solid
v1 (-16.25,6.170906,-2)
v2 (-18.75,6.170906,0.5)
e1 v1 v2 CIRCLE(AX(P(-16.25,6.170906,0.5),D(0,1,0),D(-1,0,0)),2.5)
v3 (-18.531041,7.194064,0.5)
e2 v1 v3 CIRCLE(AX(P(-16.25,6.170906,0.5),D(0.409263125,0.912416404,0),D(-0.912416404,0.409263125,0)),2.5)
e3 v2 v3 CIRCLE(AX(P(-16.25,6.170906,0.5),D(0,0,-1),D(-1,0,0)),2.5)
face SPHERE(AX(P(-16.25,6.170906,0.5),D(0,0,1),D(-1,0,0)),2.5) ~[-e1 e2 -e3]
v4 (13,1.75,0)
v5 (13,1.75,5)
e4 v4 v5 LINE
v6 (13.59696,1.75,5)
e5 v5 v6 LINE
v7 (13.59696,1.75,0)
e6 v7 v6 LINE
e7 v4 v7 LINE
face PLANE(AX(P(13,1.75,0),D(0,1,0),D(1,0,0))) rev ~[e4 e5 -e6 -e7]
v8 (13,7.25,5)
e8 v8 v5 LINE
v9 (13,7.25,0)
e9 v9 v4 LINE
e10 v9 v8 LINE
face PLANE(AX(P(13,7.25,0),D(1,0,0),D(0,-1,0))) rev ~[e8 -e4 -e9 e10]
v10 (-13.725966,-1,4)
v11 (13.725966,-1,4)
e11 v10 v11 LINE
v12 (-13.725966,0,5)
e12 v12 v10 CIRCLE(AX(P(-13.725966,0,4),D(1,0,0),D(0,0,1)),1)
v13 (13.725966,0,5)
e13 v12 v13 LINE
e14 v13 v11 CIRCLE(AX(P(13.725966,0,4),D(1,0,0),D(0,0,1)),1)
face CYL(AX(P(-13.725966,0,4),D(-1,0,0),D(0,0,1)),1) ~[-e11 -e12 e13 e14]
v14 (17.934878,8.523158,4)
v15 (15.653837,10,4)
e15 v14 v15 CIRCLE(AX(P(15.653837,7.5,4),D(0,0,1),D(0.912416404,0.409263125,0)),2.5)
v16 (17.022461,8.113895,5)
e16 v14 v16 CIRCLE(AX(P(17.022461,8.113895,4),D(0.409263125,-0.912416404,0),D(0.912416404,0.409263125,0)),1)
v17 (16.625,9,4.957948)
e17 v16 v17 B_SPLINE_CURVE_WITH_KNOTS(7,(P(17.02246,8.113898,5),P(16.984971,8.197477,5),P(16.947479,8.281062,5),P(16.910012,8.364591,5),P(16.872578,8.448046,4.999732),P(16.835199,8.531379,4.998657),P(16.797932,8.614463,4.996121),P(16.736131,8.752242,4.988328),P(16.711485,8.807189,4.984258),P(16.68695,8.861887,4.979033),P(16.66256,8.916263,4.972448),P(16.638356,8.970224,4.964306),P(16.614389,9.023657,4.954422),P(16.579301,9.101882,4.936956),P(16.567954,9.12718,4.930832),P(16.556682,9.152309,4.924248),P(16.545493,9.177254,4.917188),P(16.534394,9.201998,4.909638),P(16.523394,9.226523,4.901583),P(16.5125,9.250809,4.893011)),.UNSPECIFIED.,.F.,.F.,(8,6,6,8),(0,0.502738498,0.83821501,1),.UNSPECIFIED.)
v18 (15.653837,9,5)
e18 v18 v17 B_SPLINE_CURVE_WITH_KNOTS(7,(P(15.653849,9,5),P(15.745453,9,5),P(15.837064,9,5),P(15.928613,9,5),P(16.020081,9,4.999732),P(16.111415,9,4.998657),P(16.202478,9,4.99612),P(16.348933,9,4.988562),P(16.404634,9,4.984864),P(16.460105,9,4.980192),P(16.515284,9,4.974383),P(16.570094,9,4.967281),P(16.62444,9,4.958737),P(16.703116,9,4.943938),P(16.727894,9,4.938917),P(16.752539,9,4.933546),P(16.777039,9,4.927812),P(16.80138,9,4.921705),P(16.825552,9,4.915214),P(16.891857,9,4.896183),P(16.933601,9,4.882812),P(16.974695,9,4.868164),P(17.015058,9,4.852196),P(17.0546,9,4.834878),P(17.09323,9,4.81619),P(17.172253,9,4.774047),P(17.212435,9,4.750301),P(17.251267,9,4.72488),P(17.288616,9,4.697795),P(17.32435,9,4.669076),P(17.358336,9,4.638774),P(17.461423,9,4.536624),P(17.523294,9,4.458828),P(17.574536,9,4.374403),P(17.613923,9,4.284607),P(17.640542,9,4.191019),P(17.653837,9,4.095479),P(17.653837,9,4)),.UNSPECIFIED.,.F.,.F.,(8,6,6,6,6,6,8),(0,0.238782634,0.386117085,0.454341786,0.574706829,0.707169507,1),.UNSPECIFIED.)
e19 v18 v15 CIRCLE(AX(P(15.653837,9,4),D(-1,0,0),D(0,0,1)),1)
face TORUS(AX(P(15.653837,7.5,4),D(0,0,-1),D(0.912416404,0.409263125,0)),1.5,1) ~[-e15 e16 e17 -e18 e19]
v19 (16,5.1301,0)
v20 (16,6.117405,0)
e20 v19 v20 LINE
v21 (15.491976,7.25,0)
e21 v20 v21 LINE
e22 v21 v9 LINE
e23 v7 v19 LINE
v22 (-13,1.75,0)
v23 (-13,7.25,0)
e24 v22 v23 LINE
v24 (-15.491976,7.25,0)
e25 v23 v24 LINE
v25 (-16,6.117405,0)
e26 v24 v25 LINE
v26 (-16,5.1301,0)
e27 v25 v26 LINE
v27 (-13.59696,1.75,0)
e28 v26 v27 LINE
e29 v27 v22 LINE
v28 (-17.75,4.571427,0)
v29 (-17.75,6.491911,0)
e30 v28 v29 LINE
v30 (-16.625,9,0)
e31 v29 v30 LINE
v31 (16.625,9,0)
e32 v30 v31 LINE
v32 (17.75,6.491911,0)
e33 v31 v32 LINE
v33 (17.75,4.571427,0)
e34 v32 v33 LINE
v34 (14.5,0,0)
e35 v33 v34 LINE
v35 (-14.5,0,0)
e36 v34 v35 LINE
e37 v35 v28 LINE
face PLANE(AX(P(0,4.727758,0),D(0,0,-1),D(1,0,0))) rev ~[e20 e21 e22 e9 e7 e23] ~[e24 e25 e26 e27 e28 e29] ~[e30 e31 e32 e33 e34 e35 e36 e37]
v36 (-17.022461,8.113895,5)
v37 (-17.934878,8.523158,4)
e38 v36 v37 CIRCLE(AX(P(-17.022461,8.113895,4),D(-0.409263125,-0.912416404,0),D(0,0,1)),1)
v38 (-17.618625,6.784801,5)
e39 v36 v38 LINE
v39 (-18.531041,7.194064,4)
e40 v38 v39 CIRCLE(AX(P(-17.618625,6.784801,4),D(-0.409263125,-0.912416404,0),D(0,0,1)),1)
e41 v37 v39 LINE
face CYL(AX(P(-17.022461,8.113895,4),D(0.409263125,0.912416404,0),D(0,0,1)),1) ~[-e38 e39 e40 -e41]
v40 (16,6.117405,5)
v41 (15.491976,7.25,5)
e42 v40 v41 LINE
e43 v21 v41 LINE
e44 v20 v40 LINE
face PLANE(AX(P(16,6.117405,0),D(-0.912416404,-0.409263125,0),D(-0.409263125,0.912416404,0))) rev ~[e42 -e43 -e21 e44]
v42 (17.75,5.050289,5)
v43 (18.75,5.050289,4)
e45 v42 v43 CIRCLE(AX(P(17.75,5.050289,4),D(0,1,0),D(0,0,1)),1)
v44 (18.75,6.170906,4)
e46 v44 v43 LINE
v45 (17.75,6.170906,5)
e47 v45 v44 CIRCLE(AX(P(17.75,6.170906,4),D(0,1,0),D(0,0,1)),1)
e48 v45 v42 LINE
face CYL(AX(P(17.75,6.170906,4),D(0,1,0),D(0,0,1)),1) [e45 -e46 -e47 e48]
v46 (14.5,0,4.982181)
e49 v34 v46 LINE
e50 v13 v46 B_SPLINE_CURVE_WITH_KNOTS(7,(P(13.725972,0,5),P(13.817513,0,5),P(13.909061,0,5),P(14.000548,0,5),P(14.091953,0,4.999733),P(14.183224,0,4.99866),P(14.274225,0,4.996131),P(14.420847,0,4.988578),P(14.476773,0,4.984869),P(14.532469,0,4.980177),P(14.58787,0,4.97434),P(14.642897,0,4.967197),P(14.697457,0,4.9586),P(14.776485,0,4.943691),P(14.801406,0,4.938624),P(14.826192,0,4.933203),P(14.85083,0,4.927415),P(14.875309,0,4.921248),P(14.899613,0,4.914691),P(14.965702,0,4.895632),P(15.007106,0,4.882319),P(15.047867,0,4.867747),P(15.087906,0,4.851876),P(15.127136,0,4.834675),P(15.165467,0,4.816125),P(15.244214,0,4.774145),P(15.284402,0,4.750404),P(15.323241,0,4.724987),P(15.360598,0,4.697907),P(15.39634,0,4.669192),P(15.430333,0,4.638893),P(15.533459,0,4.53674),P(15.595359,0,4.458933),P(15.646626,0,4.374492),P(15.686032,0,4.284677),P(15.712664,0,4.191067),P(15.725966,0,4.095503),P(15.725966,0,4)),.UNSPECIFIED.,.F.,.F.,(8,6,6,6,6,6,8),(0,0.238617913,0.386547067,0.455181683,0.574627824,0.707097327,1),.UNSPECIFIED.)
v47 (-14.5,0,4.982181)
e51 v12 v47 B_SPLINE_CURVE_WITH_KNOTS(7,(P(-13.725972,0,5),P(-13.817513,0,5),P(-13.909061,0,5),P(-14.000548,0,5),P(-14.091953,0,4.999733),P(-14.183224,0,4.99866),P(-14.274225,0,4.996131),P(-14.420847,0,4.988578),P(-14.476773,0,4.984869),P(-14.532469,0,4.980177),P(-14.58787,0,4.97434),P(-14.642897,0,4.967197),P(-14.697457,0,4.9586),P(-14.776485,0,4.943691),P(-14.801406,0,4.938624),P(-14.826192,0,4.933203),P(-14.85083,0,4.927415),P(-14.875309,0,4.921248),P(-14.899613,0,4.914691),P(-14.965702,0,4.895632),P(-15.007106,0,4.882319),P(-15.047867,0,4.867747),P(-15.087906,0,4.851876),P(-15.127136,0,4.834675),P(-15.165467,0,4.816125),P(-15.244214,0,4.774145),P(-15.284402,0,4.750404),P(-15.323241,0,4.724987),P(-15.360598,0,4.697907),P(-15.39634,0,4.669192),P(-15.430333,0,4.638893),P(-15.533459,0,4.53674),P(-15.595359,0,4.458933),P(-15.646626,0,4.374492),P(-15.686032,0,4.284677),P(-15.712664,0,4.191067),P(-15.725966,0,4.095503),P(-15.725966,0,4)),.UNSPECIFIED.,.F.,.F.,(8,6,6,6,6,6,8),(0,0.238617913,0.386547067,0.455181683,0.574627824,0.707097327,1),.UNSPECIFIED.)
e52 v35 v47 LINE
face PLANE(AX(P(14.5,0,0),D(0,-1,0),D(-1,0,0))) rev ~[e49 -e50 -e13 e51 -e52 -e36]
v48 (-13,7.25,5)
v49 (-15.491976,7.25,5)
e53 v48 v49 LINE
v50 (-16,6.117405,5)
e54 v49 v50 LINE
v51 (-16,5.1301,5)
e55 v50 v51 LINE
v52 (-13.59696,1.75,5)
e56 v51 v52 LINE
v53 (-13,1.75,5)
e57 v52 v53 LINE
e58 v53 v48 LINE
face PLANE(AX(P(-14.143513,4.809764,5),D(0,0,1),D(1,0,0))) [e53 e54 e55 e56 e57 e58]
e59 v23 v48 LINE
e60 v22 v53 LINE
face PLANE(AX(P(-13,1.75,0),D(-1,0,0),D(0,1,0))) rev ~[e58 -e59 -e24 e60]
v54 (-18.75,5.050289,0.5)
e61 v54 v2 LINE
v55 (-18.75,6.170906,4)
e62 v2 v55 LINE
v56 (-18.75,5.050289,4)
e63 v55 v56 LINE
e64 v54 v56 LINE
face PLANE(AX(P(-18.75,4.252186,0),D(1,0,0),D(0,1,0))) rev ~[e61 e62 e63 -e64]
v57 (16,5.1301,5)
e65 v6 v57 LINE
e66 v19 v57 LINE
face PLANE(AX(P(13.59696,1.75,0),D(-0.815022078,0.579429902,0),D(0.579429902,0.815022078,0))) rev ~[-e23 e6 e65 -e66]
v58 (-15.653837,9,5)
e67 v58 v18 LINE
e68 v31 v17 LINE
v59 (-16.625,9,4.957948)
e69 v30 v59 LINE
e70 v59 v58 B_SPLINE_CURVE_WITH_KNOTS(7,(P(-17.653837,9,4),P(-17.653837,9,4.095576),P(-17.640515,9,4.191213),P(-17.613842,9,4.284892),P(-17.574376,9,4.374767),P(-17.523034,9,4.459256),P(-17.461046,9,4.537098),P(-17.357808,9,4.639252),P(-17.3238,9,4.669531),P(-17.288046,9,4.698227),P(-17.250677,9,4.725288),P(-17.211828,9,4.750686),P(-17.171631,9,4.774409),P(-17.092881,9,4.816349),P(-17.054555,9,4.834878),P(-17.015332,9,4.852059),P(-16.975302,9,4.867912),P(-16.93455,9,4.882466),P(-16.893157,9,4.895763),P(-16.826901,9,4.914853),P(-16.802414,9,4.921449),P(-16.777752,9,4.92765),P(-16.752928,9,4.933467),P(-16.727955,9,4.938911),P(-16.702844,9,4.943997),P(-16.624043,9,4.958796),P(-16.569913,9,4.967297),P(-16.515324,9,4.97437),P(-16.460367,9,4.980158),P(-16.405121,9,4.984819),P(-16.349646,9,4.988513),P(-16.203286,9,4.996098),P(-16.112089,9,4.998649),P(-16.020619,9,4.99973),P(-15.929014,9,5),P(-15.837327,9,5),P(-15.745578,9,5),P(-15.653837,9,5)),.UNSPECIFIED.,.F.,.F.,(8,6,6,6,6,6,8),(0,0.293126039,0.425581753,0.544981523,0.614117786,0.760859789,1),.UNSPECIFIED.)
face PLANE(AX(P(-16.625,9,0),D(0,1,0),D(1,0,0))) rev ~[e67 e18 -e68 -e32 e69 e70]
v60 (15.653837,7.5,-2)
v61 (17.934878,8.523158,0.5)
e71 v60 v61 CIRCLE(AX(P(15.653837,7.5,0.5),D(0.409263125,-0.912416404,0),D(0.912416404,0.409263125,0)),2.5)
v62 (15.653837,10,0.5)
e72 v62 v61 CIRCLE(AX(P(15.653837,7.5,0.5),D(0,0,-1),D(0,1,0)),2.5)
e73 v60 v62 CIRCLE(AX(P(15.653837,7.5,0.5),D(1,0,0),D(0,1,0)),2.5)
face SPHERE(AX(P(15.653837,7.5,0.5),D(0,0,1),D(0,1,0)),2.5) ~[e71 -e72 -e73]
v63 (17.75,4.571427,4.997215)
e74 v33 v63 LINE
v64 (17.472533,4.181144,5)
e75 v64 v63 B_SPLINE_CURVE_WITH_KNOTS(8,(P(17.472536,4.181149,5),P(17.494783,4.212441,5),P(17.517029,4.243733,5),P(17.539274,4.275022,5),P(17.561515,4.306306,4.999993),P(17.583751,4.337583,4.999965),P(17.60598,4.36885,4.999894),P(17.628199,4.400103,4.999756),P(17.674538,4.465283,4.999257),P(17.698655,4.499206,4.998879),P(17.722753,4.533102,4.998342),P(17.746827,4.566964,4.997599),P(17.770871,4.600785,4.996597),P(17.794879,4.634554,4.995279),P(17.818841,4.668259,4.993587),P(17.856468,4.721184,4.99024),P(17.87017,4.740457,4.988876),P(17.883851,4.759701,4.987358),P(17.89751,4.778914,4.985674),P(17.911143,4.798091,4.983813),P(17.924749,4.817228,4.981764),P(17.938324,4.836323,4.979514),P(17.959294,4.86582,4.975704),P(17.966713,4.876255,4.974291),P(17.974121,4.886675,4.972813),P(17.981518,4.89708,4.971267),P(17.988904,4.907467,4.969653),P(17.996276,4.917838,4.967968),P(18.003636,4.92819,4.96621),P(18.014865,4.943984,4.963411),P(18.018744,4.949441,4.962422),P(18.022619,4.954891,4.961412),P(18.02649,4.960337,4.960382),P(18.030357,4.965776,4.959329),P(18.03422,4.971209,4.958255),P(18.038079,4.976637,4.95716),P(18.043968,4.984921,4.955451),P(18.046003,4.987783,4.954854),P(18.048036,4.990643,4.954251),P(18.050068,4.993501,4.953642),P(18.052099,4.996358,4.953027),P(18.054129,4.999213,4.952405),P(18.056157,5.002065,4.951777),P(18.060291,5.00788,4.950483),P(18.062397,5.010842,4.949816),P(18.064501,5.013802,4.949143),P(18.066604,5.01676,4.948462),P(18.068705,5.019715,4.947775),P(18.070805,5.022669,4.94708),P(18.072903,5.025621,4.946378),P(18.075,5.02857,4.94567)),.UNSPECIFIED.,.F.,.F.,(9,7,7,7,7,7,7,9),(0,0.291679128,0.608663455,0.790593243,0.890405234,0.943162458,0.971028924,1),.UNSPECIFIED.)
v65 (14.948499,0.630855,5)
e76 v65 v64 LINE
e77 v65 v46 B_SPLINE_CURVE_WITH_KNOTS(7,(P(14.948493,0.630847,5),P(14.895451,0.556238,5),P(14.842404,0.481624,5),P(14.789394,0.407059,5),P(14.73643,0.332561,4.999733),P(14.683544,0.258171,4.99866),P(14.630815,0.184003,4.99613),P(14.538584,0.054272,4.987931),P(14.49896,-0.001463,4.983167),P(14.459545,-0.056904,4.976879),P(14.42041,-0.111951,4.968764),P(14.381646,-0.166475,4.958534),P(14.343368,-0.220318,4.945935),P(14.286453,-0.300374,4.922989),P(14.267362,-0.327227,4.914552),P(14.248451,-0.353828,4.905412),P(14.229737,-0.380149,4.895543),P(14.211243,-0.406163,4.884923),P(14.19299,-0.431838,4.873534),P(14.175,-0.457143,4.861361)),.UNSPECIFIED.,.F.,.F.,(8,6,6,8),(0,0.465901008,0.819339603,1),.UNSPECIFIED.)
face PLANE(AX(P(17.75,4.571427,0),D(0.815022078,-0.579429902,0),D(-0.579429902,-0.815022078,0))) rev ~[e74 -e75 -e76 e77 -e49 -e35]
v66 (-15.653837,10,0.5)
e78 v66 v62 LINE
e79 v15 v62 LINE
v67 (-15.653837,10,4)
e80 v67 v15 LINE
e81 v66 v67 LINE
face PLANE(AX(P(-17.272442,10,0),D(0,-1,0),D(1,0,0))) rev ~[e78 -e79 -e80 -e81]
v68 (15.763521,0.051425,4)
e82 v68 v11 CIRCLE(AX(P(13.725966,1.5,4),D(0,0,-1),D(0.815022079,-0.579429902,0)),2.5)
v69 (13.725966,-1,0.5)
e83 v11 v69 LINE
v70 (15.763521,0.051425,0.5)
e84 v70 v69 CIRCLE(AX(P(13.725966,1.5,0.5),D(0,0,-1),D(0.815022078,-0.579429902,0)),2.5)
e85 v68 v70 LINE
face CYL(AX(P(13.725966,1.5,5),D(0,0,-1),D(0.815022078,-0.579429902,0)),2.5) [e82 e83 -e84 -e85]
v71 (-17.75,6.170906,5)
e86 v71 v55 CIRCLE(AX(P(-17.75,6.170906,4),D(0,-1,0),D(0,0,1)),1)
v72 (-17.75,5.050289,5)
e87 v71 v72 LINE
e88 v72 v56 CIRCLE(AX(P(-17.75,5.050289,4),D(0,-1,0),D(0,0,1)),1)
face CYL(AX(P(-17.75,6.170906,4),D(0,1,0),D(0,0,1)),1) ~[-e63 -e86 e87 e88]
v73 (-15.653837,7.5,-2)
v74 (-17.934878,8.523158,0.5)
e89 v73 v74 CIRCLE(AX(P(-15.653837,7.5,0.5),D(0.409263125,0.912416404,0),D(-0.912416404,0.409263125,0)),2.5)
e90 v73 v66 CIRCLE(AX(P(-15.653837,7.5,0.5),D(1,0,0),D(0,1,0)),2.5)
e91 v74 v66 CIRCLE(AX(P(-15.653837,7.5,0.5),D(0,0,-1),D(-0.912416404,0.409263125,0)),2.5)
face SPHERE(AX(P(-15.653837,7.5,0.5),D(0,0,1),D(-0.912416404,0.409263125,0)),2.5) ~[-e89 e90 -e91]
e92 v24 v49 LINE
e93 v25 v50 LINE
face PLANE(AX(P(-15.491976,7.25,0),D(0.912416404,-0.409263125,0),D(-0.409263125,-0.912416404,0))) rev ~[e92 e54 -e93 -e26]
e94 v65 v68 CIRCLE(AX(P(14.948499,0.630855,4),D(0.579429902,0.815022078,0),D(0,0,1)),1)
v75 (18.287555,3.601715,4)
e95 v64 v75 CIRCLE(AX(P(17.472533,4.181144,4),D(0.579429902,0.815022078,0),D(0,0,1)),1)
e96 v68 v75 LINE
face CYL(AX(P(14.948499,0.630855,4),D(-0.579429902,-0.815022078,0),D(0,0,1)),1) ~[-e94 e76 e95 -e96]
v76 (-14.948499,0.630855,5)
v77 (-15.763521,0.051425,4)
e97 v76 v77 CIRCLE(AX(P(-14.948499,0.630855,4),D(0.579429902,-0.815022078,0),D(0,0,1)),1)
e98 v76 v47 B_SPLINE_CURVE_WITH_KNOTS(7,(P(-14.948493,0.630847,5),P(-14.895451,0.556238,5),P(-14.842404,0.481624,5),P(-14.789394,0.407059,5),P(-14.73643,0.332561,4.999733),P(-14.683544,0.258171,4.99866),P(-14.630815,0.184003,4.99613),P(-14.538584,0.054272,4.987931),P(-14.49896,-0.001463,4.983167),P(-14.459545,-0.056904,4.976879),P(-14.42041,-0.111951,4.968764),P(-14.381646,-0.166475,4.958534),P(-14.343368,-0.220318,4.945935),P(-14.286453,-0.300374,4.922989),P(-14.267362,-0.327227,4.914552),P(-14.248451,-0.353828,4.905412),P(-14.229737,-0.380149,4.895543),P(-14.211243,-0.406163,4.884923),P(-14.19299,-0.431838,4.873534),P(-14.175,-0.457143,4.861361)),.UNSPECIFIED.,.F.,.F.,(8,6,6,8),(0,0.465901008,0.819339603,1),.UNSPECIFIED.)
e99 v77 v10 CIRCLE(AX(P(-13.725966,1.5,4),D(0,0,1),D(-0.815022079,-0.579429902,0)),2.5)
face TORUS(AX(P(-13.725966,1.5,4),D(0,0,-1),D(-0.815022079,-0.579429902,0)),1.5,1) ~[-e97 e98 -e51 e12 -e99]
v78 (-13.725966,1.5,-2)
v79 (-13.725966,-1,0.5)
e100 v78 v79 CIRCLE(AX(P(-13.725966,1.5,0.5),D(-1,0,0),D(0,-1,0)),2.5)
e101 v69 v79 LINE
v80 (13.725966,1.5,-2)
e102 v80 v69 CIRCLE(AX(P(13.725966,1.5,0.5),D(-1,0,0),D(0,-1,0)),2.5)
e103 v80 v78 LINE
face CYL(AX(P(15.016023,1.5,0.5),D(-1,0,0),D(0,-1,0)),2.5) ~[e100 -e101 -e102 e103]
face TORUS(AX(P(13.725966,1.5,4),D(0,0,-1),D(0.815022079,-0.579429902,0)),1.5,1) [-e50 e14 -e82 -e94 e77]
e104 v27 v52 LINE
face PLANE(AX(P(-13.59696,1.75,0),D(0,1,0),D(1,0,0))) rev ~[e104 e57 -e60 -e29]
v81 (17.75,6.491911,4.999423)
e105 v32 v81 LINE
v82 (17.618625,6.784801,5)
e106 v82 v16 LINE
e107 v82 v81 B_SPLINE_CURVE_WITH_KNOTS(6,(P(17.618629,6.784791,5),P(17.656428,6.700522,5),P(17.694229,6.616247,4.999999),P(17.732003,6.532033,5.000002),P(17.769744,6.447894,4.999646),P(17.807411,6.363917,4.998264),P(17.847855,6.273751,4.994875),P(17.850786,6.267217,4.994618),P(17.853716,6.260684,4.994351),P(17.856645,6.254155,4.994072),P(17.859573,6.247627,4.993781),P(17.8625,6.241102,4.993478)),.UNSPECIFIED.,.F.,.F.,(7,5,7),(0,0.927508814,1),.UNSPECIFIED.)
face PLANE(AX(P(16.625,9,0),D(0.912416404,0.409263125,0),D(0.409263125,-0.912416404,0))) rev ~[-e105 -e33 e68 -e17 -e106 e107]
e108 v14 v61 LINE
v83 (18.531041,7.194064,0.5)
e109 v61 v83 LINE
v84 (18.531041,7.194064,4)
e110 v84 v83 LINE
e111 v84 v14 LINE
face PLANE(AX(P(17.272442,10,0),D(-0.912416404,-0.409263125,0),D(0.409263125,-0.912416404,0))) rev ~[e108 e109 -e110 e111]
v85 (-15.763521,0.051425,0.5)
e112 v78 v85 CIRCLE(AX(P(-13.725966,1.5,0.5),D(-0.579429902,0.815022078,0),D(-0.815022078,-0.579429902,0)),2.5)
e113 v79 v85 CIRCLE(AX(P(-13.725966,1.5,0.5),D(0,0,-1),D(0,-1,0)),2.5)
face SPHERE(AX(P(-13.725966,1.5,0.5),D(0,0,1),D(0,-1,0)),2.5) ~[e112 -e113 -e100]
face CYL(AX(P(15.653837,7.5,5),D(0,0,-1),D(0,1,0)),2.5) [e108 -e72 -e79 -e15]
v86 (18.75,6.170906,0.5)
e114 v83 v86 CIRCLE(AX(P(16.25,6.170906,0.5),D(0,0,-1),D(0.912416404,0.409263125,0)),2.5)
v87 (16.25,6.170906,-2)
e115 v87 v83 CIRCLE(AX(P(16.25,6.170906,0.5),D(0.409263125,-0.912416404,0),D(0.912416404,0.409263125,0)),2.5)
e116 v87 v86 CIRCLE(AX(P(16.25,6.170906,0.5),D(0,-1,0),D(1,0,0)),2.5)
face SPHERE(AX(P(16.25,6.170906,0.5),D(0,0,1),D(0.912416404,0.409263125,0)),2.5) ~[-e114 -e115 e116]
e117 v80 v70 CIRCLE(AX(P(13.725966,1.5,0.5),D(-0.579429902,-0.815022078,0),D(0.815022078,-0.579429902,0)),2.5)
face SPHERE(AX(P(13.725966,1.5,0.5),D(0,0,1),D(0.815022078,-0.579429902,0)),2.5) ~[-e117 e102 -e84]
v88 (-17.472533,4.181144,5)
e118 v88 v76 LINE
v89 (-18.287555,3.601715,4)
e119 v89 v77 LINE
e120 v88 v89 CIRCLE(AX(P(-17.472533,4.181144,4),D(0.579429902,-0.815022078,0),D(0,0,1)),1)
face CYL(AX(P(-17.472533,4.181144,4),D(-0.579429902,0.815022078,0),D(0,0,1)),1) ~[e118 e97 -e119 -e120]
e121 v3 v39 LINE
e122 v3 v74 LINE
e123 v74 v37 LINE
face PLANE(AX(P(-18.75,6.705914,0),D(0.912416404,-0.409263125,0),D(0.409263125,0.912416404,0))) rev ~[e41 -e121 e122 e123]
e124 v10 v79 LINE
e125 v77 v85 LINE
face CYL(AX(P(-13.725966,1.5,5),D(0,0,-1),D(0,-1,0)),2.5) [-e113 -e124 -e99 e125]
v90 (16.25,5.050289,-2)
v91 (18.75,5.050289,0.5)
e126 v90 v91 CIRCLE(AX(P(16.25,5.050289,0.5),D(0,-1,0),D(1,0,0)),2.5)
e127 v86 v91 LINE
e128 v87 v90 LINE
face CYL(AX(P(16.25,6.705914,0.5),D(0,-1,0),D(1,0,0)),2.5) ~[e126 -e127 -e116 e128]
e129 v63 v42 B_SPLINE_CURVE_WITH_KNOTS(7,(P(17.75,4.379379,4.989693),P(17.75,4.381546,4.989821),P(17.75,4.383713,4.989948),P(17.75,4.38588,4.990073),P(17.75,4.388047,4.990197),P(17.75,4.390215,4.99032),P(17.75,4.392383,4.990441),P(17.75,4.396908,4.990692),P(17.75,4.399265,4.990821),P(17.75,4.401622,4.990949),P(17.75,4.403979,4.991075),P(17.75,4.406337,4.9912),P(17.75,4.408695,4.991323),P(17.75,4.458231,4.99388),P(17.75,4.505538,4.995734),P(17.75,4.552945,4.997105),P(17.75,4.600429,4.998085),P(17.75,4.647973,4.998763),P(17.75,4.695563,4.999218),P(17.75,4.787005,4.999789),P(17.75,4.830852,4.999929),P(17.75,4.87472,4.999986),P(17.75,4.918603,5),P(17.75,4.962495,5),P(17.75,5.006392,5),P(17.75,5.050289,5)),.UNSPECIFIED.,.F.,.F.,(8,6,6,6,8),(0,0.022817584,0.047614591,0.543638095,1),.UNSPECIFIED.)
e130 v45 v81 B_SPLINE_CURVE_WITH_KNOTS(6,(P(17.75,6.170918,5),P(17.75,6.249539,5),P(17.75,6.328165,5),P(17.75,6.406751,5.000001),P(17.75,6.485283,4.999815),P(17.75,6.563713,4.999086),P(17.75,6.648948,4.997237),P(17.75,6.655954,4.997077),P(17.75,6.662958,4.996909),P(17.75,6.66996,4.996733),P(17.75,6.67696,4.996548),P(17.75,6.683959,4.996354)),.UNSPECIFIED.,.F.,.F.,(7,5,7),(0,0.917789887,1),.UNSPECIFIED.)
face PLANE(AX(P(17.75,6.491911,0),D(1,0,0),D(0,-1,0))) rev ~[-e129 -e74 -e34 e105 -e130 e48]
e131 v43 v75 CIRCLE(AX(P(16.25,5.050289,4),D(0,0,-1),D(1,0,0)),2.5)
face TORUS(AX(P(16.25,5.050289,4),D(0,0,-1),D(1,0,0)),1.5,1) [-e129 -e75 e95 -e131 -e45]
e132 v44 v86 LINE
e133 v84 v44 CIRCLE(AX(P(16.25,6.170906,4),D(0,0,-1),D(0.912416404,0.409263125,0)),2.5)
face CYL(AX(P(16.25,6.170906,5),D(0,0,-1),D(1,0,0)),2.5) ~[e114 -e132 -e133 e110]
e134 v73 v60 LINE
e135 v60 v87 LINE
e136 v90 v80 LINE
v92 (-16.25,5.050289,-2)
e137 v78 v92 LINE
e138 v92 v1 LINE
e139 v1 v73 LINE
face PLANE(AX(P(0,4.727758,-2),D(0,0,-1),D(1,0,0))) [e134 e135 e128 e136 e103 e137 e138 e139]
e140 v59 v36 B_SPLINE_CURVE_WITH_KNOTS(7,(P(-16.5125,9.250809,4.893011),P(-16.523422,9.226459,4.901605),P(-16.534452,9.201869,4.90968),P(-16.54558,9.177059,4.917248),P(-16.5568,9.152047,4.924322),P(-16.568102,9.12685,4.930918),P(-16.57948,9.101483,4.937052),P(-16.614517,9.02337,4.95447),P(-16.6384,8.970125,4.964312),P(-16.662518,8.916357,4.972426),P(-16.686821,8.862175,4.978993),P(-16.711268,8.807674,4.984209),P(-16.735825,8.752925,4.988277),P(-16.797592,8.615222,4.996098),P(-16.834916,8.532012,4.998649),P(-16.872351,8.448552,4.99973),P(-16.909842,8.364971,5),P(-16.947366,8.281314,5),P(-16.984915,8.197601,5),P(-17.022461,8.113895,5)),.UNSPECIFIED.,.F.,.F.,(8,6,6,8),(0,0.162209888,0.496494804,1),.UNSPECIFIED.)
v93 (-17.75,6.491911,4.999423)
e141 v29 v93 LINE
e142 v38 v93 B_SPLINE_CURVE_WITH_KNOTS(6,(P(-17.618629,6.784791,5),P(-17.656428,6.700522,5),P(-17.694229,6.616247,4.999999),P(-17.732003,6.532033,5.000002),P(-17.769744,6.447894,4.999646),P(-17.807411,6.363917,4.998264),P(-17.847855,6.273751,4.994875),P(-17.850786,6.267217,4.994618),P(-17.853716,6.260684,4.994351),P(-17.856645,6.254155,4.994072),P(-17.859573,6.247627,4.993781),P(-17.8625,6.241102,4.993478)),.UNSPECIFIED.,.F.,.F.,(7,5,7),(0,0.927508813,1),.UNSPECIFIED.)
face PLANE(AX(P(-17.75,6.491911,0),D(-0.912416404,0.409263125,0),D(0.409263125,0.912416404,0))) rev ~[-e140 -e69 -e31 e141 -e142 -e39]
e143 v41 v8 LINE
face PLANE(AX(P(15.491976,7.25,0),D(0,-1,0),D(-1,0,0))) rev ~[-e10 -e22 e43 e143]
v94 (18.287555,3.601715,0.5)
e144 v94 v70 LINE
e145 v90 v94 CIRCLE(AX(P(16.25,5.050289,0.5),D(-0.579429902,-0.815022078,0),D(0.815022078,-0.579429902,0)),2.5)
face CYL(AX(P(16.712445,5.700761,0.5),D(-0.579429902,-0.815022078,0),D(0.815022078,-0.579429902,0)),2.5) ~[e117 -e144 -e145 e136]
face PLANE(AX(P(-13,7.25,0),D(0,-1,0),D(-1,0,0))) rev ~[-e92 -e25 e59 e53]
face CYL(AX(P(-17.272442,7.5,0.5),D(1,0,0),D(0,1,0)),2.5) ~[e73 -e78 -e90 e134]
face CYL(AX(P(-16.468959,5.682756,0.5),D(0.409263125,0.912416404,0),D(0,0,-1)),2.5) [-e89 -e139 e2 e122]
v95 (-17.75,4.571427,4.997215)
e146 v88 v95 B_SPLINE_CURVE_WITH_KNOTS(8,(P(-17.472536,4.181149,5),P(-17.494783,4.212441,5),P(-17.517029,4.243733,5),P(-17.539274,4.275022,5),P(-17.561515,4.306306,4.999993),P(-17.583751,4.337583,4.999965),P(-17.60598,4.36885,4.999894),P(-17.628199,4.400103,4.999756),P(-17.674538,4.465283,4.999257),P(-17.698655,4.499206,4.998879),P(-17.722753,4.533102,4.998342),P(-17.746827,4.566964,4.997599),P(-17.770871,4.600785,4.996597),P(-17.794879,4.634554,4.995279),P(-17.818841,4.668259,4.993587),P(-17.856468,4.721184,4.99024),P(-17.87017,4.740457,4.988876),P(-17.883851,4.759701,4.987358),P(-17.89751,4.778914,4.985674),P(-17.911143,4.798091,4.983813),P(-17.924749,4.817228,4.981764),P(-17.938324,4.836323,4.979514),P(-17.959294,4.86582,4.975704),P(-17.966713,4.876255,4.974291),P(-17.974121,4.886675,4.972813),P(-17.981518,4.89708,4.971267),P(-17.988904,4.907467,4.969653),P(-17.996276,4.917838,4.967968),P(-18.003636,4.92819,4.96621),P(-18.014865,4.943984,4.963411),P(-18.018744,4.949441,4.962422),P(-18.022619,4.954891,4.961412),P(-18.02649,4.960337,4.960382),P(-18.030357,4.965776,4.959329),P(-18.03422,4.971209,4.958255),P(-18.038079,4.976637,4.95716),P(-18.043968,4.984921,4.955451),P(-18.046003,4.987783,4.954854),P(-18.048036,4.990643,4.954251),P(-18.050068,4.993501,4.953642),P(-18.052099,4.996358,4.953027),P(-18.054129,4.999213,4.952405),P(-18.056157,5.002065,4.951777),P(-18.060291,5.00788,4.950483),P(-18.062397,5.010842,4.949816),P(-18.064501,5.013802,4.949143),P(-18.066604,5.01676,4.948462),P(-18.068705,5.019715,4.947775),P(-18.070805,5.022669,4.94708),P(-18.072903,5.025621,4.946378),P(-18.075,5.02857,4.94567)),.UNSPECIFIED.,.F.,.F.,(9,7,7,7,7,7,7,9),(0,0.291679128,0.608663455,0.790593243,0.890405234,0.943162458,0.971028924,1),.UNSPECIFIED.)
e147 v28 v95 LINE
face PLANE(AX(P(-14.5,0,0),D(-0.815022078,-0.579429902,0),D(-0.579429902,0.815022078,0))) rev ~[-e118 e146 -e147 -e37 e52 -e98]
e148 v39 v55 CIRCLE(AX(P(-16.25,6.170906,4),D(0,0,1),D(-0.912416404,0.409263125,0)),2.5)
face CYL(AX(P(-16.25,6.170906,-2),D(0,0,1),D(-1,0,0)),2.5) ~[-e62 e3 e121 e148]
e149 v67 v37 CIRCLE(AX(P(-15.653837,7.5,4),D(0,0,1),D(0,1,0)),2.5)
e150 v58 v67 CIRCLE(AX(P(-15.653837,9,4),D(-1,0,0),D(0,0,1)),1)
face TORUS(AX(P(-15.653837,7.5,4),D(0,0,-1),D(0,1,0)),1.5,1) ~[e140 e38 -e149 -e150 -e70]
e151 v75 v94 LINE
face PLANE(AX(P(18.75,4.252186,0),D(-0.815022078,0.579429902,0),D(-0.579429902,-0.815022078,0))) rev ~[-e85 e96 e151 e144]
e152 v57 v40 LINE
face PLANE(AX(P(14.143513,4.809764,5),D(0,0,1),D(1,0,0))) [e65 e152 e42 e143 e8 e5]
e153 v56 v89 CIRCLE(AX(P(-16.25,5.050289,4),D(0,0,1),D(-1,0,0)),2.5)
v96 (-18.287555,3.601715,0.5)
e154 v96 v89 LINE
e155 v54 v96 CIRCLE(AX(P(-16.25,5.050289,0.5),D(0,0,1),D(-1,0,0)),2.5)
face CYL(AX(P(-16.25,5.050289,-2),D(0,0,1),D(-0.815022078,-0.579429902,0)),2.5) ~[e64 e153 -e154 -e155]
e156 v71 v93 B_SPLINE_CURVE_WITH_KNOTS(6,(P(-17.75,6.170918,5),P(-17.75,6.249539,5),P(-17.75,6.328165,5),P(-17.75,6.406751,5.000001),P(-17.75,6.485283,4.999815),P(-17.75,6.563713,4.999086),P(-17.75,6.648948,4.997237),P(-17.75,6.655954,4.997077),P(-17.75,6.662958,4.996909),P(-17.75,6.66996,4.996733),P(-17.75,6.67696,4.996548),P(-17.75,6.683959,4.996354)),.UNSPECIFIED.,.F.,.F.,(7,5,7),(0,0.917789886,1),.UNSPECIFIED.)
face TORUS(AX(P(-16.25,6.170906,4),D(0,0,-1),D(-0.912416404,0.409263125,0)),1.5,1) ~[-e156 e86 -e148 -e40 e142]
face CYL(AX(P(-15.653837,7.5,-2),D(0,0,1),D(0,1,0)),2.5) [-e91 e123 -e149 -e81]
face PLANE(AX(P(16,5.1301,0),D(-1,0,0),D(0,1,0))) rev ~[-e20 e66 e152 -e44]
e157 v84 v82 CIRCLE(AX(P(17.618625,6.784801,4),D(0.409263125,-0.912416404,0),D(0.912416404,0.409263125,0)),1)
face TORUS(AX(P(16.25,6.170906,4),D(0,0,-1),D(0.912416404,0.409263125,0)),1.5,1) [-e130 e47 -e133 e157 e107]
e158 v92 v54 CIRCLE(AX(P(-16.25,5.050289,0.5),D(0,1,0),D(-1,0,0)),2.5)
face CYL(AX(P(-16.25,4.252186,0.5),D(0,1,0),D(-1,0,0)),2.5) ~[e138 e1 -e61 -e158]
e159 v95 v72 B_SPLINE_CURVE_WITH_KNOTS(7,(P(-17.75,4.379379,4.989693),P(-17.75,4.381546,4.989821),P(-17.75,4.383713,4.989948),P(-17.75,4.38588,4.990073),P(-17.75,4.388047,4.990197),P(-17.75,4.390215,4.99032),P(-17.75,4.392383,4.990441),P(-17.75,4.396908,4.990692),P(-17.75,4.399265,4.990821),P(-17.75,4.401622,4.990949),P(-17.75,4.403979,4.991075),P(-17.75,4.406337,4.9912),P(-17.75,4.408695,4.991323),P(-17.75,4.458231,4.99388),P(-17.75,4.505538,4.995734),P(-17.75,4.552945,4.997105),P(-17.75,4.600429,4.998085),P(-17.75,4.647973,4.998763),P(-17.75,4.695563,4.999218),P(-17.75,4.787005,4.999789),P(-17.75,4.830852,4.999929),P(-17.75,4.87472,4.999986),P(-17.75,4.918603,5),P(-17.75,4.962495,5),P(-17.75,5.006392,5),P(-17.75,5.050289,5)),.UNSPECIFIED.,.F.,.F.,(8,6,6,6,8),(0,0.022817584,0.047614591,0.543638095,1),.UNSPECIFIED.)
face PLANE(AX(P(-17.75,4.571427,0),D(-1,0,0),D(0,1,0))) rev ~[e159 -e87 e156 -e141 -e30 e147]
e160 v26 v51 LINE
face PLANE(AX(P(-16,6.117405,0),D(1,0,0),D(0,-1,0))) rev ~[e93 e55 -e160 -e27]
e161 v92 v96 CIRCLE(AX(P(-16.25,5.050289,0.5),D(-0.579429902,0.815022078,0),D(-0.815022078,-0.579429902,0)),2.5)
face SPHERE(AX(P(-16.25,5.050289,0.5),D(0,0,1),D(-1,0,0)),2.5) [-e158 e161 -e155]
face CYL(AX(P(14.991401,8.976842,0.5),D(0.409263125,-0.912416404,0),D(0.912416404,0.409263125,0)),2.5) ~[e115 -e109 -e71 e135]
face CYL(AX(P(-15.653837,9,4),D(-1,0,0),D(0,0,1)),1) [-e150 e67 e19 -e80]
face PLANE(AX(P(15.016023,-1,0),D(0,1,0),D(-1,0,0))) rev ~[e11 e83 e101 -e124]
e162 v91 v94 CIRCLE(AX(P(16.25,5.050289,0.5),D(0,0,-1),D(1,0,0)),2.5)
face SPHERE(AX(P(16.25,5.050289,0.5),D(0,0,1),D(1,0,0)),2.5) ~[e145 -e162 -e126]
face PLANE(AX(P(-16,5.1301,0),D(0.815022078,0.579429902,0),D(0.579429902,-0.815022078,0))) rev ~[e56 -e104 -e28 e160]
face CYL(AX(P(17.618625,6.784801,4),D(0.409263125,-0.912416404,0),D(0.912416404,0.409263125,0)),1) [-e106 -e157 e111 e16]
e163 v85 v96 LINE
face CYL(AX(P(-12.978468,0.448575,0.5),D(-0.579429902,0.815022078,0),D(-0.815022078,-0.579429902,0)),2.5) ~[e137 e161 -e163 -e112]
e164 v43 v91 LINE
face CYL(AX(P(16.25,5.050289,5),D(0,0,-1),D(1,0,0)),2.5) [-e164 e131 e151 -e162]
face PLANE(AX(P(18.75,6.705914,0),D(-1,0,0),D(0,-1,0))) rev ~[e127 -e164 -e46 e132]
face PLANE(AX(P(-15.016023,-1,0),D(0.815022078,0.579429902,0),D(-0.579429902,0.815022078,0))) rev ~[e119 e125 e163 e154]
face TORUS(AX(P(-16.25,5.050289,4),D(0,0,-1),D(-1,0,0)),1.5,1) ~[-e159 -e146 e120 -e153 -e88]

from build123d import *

# Parameters (mm, degrees)
F1_DEPTH     = 5
F3_DEPTH     = 2
F4_R         = 2.5
F5_T1_DEPTH  = 27.4519311484
F5_T3_DEPTH  = 1.45667481
F5_T5_DEPTH  = 1.1206167057
F5_T7_DEPTH  = 31.3076734299
F5_T9_DEPTH  = 4.3560651868
F5_T11_DEPTH = 1.45667481
F5_T13_DEPTH = 4.3560651868
F5_T16_ANGLE = 24.1585538769
F5_T18_ANGLE = 65.8414461231
F5_T20_ANGLE = 35.4104549915
F5_T22_ANGLE = 65.8414461231
F5_T24_ANGLE = 54.5895450085
F5_T26_ANGLE = 24.1585538769
F5_T28_ANGLE = 54.5895450085
F5_T30_ANGLE = 35.4104549915


# Not quite as in the source:
# - a fillet or chamfer that OpenCascade refuses, or shapes differently, is made with other operations: its cross-section is extruded or revolved along the edge and cut away or added


with BuildPart() as f1:
    # F0 (on Top) → F1 (new body)
    with BuildSketch(Plane.XY):
        Polygon((18.75, 6.7059138706), (17.27244219, 10), (0, 10), (-17.27244219, 10), (-18.75, 6.7059138706), (-18.75, 4.2521861975), (-15.0160229505, -1), (0, -1), (15.0160229505, -1), (18.75, 4.2521861975), align=None)
        Polygon((14.5, 0), (0, 0), (-14.5, 0), (-17.75, 4.5714274394), (-17.75, 6.4919107255), (-16.625, 9), (0, 9), (16.625, 9), (17.75, 6.4919107255), (17.75, 4.5714274394), align=None, mode=Mode.SUBTRACT)
    extrude(amount=F1_DEPTH)



with BuildPart() as f1b:
    # F0 (on Top) → F1, piece 2 (new body)
    with BuildSketch(Plane.XY):
        Polygon((-15.4919761674, 7.25), (-16, 6.1174052217), (-16, 5.1300996126), (-13.5969598365, 1.75), (-13, 1.75), (-13, 7.25), align=None)
    extrude(amount=F1_DEPTH)


with BuildPart() as f1c:
    # F0 (on Top) → F1, piece 3 (new body)
    with BuildSketch(Plane.XY):
        Polygon((16, 6.1174052217), (15.4919761674, 7.25), (13, 7.25), (13, 1.75), (13.5969598365, 1.75), (16, 5.1300996126), align=None)
    extrude(amount=F1_DEPTH)


with BuildPart() as f1_1:
    add(f1.part)

    add(f1b.part)  # F3 merges F1b

    add(f1c.part)  # F3 merges F1c
    # F2 (on face) → F3 (join)
    with BuildSketch(Plane(origin=(0, 0, 0), x_dir=(1, 0, 0), z_dir=(0, 0, -1))):
        Polygon((-17.27244219, -10), (17.27244219, -10), (18.75, -6.7059138706), (18.75, -4.2521861975), (15.0160229505, 1), (-15.0160229505, 1), (-18.75, -4.2521861975), (-18.75, -6.7059138706), align=None)
    extrude(amount=F3_DEPTH)

    # F4
    f4_edges = [f1_1.edges().sort_by_distance(p)[0] for p in [
        (-18.75, 5.47905, -2),
        (-18.011221, 8.352957, -2),
        (0, 10, -2),
        (18.011221, 8.352957, -2),
        (18.75, 5.47905, -2),
        (16.883011, 1.626093, -2),
        (0, -1, -2),
        (-16.883011, 1.626093, -2),
        (-15.016023, -1, 1.5),
        (-18.75, 4.252186, 1.5),
        (-18.75, 6.705914, 1.5),
        (-17.272442, 10, 1.5),
        (15.016023, -1, 1.5),
        (18.75, 4.252186, 1.5),
        (17.272442, 10, 1.5),
        (18.75, 6.705914, 1.5),
    ]]
    fillet(f4_edges, radius=F4_R)

    # F5: fillet of radius 1 on 16 edges, made by hand

    # F5_s2 → F5_t1 (cut)
    with BuildSketch(Plane.YZ.offset(-13.7259655742)):
        with BuildLine():
            ThreePointArc((0, 5), (-0.7071067812, 4.7071067812), (-1, 4))
            Line((-1, 4), (-1, 5))
            Line((-1, 5), (0, 5))
        make_face()
    extrude(amount=F5_T1_DEPTH, mode=Mode.SUBTRACT)

    # F5_s4 → F5_t3 (cut)
    with BuildSketch(Plane(origin=(0.417485186, -0.9307467709, 0), x_dir=(0, 0, 1), z_dir=(-0.4092631251, 0.9124164041, 0))):
        with BuildLine():
            ThreePointArc((4, 19.8522908438), (4.7071067812, 19.5593976249), (5, 18.8522908438))
            Line((5, 18.8522908438), (5, 19.8522908438))
            Line((5, 19.8522908438), (4, 19.8522908438))
        make_face()
    extrude(amount=F5_T3_DEPTH, mode=Mode.SUBTRACT)

    # F5_s6 → F5_t5 (cut)
    with BuildSketch(Plane.XZ.offset(-6.1709060079)):
        with BuildLine():
            ThreePointArc((17.75, 5), (18.4571067812, 4.7071067812), (18.75, 4))
            Line((18.75, 4), (18.75, 5))
            Line((18.75, 5), (17.75, 5))
        make_face()
        with BuildLine():
            ThreePointArc((-17.75, 5), (-18.4571067812, 4.7071067812), (-18.75, 4))
            Line((-18.75, 4), (-18.75, 5))
            Line((-18.75, 5), (-17.75, 5))
        make_face()
    extrude(amount=F5_T5_DEPTH, mode=Mode.SUBTRACT)

    # F5_s8 → F5_t7 (cut)
    with BuildSketch(Plane.YZ.offset(-15.6538367149)):
        with BuildLine():
            ThreePointArc((9, 5), (9.7071067812, 4.7071067812), (10, 4))
            Line((10, 4), (10, 5))
            Line((10, 5), (9, 5))
        make_face()
    extrude(amount=F5_T7_DEPTH, mode=Mode.SUBTRACT)

    # F5_s10 → F5_t9 (cut)
    with BuildSketch(Plane(origin=(5.3167143619, 7.4784535142, 0), x_dir=(0, 0, 1), z_dir=(0.5794299023, 0.8150220784, 0))):
        with BuildLine():
            ThreePointArc((5, 11.8178201367), (4.7071067812, 12.5249269179), (4, 12.8178201367))
            Line((4, 12.8178201367), (5, 12.8178201367))
            Line((5, 12.8178201367), (5, 11.8178201367))
        make_face()
    extrude(amount=F5_T9_DEPTH, mode=Mode.SUBTRACT)

    # F5_s12 → F5_t11 (cut)
    with BuildSketch(Plane(origin=(0.1786780991, 0.3983472212, 0), x_dir=(0, 0, 1), z_dir=(-0.4092631251, -0.9124164041, 0))):
        with BuildLine():
            ThreePointArc((5, 18.8522908438), (4.7071067812, 19.5593976249), (4, 19.8522908438))
            Line((4, 19.8522908438), (5, 19.8522908438))
            Line((5, 19.8522908438), (5, 18.8522908438))
        make_face()
    extrude(amount=F5_T11_DEPTH, mode=Mode.SUBTRACT)

    # F5_s14 → F5_t13 (cut)
    with BuildSketch(Plane(origin=(-7.8407487877, 11.0287428164, 0), x_dir=(0, 0, 1), z_dir=(0.5794299023, -0.8150220784, 0))):
        with BuildLine():
            ThreePointArc((5, 11.8178201367), (4.7071067812, 12.5249269179), (4, 12.8178201367))
            Line((4, 12.8178201367), (5, 12.8178201367))
            Line((5, 12.8178201367), (5, 11.8178201367))
        make_face()
    extrude(amount=F5_T13_DEPTH, mode=Mode.SUBTRACT)

    # F5_s15 → F5_t16 (revolve, cut)
    with BuildSketch(Plane(origin=(0.417485186, -0.9307467709, 0), x_dir=(0, 0, 1), z_dir=(-0.4092631251, 0.9124164041, 0))):
        with BuildLine():
            ThreePointArc((5, 18.8522908438), (4.7071067812, 19.5593976249), (4, 19.8522908438))
            Line((4, 19.8522908438), (5, 19.8522908438))
            Line((5, 19.8522908438), (5, 18.8522908438))
        make_face()
    revolve(axis=Axis((16.25, 6.1709060079, 5), (0, 0, -1)), revolution_arc=F5_T16_ANGLE, mode=Mode.SUBTRACT)

    # F5_s17 → F5_t18 (revolve, cut)
    with BuildSketch(Plane(origin=(-0.1786780991, 0.3983472212, 0), x_dir=(0, 0, 1), z_dir=(0.4092631251, -0.9124164041, 0))):
        with BuildLine():
            ThreePointArc((5, -18.8522908438), (4.7071067812, -19.5593976249), (4, -19.8522908438))
            Line((4, -19.8522908438), (5, -19.8522908438))
            Line((5, -19.8522908438), (5, -18.8522908438))
        make_face()
    revolve(axis=Axis((15.6538367149, 7.5, 5), (0, 0, 1)), revolution_arc=F5_T18_ANGLE, mode=Mode.SUBTRACT)

    # F5_s19 → F5_t20 (revolve, cut)
    with BuildSketch(Plane.XZ.offset(-5.0502893022)):
        with BuildLine():
            ThreePointArc((17.75, 5), (18.4571067812, 4.7071067812), (18.75, 4))
            Line((18.75, 4), (18.75, 5))
            Line((18.75, 5), (17.75, 5))
        make_face()
    revolve(axis=Axis((16.25, 5.0502893022, 5), (0, 0, -1)), revolution_arc=F5_T20_ANGLE, mode=Mode.SUBTRACT)

    # F5_s21 → F5_t22 (revolve, cut)
    with BuildSketch(Plane.YZ.offset(-15.6538367149)):
        with BuildLine():
            ThreePointArc((9, 5), (9.7071067812, 4.7071067812), (10, 4))
            Line((10, 4), (10, 5))
            Line((10, 5), (9, 5))
        make_face()
    revolve(axis=Axis((-15.6538367149, 7.5, 5), (0, 0, 1)), revolution_arc=F5_T22_ANGLE, mode=Mode.SUBTRACT)

    # F5_s23 → F5_t24 (revolve, cut)
    with BuildSketch(Plane(origin=(5.3167143619, 7.4784535142, 0), x_dir=(0, 0, 1), z_dir=(0.5794299023, 0.8150220784, 0))):
        with BuildLine():
            ThreePointArc((5, 11.8178201367), (4.7071067812, 12.5249269179), (4, 12.8178201367))
            Line((4, 12.8178201367), (5, 12.8178201367))
            Line((5, 12.8178201367), (5, 11.8178201367))
        make_face()
    revolve(axis=Axis((13.7259655742, 1.5, 5), (0, 0, -1)), revolution_arc=F5_T24_ANGLE, mode=Mode.SUBTRACT)

    # F5_s25 → F5_t26 (revolve, cut)
    with BuildSketch(Plane(origin=(-0.417485186, -0.9307467709, 0), x_dir=(0, 0, 1), z_dir=(0.4092631251, 0.9124164041, 0))):
        with BuildLine():
            ThreePointArc((5, -18.8522908438), (4.7071067812, -19.5593976249), (4, -19.8522908438))
            Line((4, -19.8522908438), (5, -19.8522908438))
            Line((5, -19.8522908438), (5, -18.8522908438))
        make_face()
    revolve(axis=Axis((-16.25, 6.1709060079, 5), (0, 0, 1)), revolution_arc=F5_T26_ANGLE, mode=Mode.SUBTRACT)

    # F5_s27 → F5_t28 (revolve, cut)
    with BuildSketch(Plane(origin=(-5.3167143619, 7.4784535142, 0), x_dir=(0, 0, 1), z_dir=(-0.5794299023, 0.8150220784, 0))):
        with BuildLine():
            ThreePointArc((5, -11.8178201367), (4.7071067812, -12.5249269179), (4, -12.8178201367))
            Line((4, -12.8178201367), (5, -12.8178201367))
            Line((5, -12.8178201367), (5, -11.8178201367))
        make_face()
    revolve(axis=Axis((-13.7259655742, 1.5, 5), (0, 0, 1)), revolution_arc=F5_T28_ANGLE, mode=Mode.SUBTRACT)

    # F5_s29 → F5_t30 (revolve, cut)
    with BuildSketch(Plane.XZ.offset(-5.0502893022)):
        with BuildLine():
            ThreePointArc((-17.75, 5), (-18.4571067812, 4.7071067812), (-18.75, 4))
            Line((-18.75, 4), (-18.75, 5))
            Line((-18.75, 5), (-17.75, 5))
        make_face()
    revolve(axis=Axis((-16.25, 5.0502893022, 5), (0, 0, 1)), revolution_arc=F5_T30_ANGLE, mode=Mode.SUBTRACT)


solid = f1_1.part
